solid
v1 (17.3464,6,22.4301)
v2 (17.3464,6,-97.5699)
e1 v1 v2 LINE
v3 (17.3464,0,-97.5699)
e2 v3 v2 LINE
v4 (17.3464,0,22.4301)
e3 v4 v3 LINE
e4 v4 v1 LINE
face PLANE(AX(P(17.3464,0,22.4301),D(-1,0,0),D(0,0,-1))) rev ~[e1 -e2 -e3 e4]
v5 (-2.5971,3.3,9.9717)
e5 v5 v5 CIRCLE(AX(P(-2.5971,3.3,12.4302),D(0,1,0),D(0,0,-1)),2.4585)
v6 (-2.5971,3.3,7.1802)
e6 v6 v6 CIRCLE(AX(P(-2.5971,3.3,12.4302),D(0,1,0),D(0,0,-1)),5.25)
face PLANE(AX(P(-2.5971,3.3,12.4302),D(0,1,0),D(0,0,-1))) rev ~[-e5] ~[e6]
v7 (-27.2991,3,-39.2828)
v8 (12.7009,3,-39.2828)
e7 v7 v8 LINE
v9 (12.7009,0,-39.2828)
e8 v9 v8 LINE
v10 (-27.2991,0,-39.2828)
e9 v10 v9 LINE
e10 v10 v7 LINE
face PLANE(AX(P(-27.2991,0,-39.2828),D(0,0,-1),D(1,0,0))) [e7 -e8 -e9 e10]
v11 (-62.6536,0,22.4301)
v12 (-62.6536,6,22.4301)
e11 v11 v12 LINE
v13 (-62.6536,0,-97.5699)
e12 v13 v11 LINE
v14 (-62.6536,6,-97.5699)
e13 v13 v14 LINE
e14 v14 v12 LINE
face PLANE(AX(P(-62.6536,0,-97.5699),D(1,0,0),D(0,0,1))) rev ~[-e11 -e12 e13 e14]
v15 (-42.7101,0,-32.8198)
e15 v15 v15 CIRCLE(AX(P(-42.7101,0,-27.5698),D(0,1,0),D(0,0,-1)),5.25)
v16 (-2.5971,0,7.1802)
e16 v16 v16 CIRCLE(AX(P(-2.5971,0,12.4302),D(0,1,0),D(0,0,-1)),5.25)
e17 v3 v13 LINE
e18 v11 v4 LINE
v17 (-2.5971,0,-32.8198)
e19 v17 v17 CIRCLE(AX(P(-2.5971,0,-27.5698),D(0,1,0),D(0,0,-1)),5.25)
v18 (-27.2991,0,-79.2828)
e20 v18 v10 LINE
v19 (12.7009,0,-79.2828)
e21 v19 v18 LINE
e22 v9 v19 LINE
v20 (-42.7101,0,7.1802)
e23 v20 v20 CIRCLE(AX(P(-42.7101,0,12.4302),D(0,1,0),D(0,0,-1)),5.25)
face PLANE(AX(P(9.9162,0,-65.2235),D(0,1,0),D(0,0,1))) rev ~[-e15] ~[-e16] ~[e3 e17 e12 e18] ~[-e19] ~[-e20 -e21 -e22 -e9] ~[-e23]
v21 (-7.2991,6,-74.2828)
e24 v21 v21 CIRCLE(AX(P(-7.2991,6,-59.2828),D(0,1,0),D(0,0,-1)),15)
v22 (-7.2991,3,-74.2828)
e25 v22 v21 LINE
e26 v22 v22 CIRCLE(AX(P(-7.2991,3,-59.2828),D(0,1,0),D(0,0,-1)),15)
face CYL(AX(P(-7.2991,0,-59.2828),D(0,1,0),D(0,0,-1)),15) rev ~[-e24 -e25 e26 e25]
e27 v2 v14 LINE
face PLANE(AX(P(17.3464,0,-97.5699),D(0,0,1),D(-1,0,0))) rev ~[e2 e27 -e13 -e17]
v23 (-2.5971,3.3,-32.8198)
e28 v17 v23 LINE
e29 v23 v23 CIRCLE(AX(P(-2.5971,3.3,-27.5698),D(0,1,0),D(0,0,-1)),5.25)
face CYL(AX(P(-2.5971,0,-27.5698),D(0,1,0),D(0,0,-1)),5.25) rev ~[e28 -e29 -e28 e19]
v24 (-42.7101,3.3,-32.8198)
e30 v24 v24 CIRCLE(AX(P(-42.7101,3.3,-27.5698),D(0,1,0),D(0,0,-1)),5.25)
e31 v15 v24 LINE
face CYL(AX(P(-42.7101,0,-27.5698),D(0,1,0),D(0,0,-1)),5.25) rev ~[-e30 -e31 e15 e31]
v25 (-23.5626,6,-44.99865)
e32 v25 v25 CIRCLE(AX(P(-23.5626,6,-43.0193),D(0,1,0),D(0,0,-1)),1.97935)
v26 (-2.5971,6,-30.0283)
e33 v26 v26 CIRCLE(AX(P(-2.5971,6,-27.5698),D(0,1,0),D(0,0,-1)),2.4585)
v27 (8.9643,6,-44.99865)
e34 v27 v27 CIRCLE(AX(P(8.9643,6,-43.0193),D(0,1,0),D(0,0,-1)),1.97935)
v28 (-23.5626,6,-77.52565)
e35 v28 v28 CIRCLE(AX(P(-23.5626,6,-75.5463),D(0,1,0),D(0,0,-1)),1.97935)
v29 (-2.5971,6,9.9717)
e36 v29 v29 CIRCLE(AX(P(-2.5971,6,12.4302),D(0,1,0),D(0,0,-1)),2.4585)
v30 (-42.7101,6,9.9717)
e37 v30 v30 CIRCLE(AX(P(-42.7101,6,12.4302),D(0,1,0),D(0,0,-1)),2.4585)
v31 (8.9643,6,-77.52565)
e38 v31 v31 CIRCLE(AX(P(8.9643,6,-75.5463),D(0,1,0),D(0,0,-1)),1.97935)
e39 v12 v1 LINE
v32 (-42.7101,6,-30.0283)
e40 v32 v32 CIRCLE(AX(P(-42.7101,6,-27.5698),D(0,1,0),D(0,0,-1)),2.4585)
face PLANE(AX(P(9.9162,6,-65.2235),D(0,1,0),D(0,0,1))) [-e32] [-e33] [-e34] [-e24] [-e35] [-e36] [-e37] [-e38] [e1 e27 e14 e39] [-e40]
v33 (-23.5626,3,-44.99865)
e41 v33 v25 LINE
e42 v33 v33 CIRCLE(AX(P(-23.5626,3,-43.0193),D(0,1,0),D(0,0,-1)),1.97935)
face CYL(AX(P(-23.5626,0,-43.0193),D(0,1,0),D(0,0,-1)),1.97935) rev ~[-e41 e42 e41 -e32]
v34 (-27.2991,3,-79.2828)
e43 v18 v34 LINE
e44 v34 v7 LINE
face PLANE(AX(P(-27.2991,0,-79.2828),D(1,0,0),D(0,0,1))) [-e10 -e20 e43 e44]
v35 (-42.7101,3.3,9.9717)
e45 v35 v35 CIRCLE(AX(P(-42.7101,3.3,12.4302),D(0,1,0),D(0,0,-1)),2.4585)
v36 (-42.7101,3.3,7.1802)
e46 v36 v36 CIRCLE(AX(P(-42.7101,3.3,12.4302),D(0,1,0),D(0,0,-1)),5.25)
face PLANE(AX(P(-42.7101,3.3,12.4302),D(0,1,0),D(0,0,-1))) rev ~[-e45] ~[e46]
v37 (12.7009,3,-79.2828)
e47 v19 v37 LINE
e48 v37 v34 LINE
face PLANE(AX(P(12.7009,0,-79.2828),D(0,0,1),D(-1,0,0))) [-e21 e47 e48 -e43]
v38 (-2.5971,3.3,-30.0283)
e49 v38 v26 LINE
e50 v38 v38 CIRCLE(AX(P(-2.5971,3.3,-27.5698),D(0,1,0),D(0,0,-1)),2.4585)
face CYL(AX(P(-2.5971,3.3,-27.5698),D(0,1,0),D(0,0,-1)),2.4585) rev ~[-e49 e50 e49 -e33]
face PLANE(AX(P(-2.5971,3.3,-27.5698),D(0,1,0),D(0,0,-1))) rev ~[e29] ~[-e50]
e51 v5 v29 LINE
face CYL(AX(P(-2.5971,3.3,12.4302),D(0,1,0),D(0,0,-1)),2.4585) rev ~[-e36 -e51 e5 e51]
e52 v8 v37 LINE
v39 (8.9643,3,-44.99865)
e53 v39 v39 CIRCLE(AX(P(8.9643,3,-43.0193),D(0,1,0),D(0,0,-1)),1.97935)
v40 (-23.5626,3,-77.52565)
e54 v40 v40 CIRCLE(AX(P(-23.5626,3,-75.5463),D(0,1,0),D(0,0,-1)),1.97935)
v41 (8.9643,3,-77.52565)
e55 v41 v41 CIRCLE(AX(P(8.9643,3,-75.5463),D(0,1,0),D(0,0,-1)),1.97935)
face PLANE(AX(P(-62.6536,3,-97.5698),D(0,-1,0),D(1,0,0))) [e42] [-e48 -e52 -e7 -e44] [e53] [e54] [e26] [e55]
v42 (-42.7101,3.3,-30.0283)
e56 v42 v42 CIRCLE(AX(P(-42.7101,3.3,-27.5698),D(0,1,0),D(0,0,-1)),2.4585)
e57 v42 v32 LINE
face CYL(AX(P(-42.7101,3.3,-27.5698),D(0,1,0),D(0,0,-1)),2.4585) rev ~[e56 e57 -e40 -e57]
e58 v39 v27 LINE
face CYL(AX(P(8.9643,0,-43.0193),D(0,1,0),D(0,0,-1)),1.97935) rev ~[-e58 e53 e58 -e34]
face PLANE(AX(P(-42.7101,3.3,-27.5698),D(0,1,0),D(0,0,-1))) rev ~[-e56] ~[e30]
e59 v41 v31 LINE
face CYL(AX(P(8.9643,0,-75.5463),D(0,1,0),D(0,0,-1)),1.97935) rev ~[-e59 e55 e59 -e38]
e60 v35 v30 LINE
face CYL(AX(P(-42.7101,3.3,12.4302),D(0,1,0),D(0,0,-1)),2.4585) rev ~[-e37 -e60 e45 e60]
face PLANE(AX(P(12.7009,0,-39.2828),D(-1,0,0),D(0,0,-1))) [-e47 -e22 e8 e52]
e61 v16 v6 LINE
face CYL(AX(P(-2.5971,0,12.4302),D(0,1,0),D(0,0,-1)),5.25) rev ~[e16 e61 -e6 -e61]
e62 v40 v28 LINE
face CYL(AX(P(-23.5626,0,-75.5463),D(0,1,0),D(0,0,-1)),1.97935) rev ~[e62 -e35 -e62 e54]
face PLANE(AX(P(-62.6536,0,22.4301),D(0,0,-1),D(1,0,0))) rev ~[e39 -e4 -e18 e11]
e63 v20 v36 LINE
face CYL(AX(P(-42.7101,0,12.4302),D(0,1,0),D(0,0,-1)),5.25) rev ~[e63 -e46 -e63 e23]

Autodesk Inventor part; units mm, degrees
ref_plane "YZ Plane" through (0, 0, 0) normal (1, 0, 0) x (0, 1, 0)
ref_plane "XZ Plane" through (0, 0, 0) normal (0, 1, 0) x (-1, 0, 0)
ref_plane "XY Plane" through (0, 0, 0) normal (0, 0, 1) x (1, 0, 0)
sketch "Schizzo1" plane through (0, 0, 0) normal (0, 1, 0) x (-1, 0, 0)
  line L0 (87.6536, 7.4302) -> (-32.3464, 7.4302)
  line L1 (-32.3464, 7.4302) -> (-32.3464, -72.5698)
  line L2 (-32.3464, -72.5698) -> (87.6536, -72.5698)
  line L3 (87.6536, -72.5698) -> (87.6536, 7.4302)
  point P0 (0, 0)
  dimension "d0" = 80
  dimension "d1" = 120
extrude "Estrusione1" add sketch "Schizzo1" along normal blind 6
move or copy body "Sposta corpo1" bodies to move or copy 1 copy no rotation origin (0, 0, 0) rotation axis (0, 1, 0) rotation angle 90 translate (9.9162, 0, -65.2235)
sketch "Schizzo7" plane through (-62.6536, 0, -97.5698) normal (0, -1, 0) x (1, 0, 0)
  circle A0 centre (19.9435, 110) radius 4
  circle A1 centre (19.9435, 70) radius 4
  circle A2 centre (60.0565, 70) radius 4
  circle A3 centre (60.0565, 110) radius 4
hole "Foro1" at (-2.5971, 0, 12.4302) at (-2.5971, 0, -27.5698) at (-42.7101, 0, -27.5698) at (-42.7101, 0, 12.4302) direction (0, 1, 0) diameter 4.917 end through all counterbore diameter 10.5 counterbore depth 3.3 thread size "M6x1" class "6H" standard "ANSI Metric M Profile"
sketch "Schizzo8" plane through (-62.6536, 0, -97.5698) normal (0, -1, 0) x (1, 0, 0)
  line L0 (75.3545, 58.287) -> (35.3545, 58.287)
  line L1 (35.3545, 58.287) -> (35.3545, 18.287)
  line L2 (35.3545, 18.287) -> (75.3545, 18.287)
  line L3 (75.3545, 18.287) -> (75.3545, 58.287)
  circle A0 centre (55.3545, 38.287) radius 15
  circle A1 centre (39.0911, 54.5505) radius 2.25
  circle A2 centre (71.618, 54.5505) radius 2.25
  circle A3 centre (39.0911, 22.0236) radius 2.25
  circle A4 centre (71.618, 22.0236) radius 2.25
  point P0 (62.6536, 97.5698)
  dimension "d14" = 30
  dimension "d16" = 4.5
  dimension "d17" = 4.5
  dimension "d18" = 4.5
  dimension "d19" = 4.5
hole "Foro2" at (8.9643, 0, -43.0193) direction (0, 1, 0) diameter 3.9587 depth 6 thread size "M4.5x0.5" class "6H" standard "ANSI Metric M Profile"
hole "Foro3" at (-23.5626, 0, -43.0193) direction (0, 1, 0) diameter 3.9587 depth 6 thread size "M4.5x0.5" class "6H" standard "ANSI Metric M Profile"
hole "Foro4" at (-23.5626, 0, -75.5463) direction (0, 1, 0) diameter 3.9587 depth 6 thread size "M4.5x0.5" class "6H" standard "ANSI Metric M Profile"
hole "Foro5" at (8.9643, 0, -75.5463) direction (0, 1, 0) diameter 3.9587 depth 6 thread size "M4.5x0.5" class "6H" standard "ANSI Metric M Profile"
sketch "Schizzo9" plane through (-62.6536, 0, -97.5698) normal (0, -1, 0) x (1, 0, 0)
  line L0 (35.3545, 58.287) -> (75.3545, 58.287)
  line L1 (75.3545, 58.287) -> (75.3545, 18.287)
  line L2 (75.3545, 18.287) -> (35.3545, 18.287)
  line L3 (35.3545, 18.287) -> (35.3545, 58.287)
  point P0 (62.6536, 97.5698)
  point P1 (35.3545, 18.287)
  point P2 (75.3545, 58.287)
  point P3 (55.3545, 38.287)
extrude "Estrusione2" cut sketch "Schizzo9" against normal blind 3
hole "Foro6" at (-7.2991, 0, -59.2828) direction (0, 1, 0) diameter 30 depth 6
equation "\"RaggioPiega\" = Spessore"
equation "\"LarghezzaScaricoPiega\" = Spessore"
equation "\"ProfonditàScaricoPiega\" = 0.5 * Spessore"
equation "\"DimensioniScaricoAngolo\" = 4 * Spessore"
equation "\"ResiduoMinimo\" = 2 * Spessore"
equation "\"RaggioTransizione\" = RaggioPiega"
equation "\"Dimensione_raggio_Jacobi\" = RaggioPiega"
equation "\"DimensioneGioco\" = Spessore"
equation "\"Spessore\" = 0.5"
properties part number "Platform"
